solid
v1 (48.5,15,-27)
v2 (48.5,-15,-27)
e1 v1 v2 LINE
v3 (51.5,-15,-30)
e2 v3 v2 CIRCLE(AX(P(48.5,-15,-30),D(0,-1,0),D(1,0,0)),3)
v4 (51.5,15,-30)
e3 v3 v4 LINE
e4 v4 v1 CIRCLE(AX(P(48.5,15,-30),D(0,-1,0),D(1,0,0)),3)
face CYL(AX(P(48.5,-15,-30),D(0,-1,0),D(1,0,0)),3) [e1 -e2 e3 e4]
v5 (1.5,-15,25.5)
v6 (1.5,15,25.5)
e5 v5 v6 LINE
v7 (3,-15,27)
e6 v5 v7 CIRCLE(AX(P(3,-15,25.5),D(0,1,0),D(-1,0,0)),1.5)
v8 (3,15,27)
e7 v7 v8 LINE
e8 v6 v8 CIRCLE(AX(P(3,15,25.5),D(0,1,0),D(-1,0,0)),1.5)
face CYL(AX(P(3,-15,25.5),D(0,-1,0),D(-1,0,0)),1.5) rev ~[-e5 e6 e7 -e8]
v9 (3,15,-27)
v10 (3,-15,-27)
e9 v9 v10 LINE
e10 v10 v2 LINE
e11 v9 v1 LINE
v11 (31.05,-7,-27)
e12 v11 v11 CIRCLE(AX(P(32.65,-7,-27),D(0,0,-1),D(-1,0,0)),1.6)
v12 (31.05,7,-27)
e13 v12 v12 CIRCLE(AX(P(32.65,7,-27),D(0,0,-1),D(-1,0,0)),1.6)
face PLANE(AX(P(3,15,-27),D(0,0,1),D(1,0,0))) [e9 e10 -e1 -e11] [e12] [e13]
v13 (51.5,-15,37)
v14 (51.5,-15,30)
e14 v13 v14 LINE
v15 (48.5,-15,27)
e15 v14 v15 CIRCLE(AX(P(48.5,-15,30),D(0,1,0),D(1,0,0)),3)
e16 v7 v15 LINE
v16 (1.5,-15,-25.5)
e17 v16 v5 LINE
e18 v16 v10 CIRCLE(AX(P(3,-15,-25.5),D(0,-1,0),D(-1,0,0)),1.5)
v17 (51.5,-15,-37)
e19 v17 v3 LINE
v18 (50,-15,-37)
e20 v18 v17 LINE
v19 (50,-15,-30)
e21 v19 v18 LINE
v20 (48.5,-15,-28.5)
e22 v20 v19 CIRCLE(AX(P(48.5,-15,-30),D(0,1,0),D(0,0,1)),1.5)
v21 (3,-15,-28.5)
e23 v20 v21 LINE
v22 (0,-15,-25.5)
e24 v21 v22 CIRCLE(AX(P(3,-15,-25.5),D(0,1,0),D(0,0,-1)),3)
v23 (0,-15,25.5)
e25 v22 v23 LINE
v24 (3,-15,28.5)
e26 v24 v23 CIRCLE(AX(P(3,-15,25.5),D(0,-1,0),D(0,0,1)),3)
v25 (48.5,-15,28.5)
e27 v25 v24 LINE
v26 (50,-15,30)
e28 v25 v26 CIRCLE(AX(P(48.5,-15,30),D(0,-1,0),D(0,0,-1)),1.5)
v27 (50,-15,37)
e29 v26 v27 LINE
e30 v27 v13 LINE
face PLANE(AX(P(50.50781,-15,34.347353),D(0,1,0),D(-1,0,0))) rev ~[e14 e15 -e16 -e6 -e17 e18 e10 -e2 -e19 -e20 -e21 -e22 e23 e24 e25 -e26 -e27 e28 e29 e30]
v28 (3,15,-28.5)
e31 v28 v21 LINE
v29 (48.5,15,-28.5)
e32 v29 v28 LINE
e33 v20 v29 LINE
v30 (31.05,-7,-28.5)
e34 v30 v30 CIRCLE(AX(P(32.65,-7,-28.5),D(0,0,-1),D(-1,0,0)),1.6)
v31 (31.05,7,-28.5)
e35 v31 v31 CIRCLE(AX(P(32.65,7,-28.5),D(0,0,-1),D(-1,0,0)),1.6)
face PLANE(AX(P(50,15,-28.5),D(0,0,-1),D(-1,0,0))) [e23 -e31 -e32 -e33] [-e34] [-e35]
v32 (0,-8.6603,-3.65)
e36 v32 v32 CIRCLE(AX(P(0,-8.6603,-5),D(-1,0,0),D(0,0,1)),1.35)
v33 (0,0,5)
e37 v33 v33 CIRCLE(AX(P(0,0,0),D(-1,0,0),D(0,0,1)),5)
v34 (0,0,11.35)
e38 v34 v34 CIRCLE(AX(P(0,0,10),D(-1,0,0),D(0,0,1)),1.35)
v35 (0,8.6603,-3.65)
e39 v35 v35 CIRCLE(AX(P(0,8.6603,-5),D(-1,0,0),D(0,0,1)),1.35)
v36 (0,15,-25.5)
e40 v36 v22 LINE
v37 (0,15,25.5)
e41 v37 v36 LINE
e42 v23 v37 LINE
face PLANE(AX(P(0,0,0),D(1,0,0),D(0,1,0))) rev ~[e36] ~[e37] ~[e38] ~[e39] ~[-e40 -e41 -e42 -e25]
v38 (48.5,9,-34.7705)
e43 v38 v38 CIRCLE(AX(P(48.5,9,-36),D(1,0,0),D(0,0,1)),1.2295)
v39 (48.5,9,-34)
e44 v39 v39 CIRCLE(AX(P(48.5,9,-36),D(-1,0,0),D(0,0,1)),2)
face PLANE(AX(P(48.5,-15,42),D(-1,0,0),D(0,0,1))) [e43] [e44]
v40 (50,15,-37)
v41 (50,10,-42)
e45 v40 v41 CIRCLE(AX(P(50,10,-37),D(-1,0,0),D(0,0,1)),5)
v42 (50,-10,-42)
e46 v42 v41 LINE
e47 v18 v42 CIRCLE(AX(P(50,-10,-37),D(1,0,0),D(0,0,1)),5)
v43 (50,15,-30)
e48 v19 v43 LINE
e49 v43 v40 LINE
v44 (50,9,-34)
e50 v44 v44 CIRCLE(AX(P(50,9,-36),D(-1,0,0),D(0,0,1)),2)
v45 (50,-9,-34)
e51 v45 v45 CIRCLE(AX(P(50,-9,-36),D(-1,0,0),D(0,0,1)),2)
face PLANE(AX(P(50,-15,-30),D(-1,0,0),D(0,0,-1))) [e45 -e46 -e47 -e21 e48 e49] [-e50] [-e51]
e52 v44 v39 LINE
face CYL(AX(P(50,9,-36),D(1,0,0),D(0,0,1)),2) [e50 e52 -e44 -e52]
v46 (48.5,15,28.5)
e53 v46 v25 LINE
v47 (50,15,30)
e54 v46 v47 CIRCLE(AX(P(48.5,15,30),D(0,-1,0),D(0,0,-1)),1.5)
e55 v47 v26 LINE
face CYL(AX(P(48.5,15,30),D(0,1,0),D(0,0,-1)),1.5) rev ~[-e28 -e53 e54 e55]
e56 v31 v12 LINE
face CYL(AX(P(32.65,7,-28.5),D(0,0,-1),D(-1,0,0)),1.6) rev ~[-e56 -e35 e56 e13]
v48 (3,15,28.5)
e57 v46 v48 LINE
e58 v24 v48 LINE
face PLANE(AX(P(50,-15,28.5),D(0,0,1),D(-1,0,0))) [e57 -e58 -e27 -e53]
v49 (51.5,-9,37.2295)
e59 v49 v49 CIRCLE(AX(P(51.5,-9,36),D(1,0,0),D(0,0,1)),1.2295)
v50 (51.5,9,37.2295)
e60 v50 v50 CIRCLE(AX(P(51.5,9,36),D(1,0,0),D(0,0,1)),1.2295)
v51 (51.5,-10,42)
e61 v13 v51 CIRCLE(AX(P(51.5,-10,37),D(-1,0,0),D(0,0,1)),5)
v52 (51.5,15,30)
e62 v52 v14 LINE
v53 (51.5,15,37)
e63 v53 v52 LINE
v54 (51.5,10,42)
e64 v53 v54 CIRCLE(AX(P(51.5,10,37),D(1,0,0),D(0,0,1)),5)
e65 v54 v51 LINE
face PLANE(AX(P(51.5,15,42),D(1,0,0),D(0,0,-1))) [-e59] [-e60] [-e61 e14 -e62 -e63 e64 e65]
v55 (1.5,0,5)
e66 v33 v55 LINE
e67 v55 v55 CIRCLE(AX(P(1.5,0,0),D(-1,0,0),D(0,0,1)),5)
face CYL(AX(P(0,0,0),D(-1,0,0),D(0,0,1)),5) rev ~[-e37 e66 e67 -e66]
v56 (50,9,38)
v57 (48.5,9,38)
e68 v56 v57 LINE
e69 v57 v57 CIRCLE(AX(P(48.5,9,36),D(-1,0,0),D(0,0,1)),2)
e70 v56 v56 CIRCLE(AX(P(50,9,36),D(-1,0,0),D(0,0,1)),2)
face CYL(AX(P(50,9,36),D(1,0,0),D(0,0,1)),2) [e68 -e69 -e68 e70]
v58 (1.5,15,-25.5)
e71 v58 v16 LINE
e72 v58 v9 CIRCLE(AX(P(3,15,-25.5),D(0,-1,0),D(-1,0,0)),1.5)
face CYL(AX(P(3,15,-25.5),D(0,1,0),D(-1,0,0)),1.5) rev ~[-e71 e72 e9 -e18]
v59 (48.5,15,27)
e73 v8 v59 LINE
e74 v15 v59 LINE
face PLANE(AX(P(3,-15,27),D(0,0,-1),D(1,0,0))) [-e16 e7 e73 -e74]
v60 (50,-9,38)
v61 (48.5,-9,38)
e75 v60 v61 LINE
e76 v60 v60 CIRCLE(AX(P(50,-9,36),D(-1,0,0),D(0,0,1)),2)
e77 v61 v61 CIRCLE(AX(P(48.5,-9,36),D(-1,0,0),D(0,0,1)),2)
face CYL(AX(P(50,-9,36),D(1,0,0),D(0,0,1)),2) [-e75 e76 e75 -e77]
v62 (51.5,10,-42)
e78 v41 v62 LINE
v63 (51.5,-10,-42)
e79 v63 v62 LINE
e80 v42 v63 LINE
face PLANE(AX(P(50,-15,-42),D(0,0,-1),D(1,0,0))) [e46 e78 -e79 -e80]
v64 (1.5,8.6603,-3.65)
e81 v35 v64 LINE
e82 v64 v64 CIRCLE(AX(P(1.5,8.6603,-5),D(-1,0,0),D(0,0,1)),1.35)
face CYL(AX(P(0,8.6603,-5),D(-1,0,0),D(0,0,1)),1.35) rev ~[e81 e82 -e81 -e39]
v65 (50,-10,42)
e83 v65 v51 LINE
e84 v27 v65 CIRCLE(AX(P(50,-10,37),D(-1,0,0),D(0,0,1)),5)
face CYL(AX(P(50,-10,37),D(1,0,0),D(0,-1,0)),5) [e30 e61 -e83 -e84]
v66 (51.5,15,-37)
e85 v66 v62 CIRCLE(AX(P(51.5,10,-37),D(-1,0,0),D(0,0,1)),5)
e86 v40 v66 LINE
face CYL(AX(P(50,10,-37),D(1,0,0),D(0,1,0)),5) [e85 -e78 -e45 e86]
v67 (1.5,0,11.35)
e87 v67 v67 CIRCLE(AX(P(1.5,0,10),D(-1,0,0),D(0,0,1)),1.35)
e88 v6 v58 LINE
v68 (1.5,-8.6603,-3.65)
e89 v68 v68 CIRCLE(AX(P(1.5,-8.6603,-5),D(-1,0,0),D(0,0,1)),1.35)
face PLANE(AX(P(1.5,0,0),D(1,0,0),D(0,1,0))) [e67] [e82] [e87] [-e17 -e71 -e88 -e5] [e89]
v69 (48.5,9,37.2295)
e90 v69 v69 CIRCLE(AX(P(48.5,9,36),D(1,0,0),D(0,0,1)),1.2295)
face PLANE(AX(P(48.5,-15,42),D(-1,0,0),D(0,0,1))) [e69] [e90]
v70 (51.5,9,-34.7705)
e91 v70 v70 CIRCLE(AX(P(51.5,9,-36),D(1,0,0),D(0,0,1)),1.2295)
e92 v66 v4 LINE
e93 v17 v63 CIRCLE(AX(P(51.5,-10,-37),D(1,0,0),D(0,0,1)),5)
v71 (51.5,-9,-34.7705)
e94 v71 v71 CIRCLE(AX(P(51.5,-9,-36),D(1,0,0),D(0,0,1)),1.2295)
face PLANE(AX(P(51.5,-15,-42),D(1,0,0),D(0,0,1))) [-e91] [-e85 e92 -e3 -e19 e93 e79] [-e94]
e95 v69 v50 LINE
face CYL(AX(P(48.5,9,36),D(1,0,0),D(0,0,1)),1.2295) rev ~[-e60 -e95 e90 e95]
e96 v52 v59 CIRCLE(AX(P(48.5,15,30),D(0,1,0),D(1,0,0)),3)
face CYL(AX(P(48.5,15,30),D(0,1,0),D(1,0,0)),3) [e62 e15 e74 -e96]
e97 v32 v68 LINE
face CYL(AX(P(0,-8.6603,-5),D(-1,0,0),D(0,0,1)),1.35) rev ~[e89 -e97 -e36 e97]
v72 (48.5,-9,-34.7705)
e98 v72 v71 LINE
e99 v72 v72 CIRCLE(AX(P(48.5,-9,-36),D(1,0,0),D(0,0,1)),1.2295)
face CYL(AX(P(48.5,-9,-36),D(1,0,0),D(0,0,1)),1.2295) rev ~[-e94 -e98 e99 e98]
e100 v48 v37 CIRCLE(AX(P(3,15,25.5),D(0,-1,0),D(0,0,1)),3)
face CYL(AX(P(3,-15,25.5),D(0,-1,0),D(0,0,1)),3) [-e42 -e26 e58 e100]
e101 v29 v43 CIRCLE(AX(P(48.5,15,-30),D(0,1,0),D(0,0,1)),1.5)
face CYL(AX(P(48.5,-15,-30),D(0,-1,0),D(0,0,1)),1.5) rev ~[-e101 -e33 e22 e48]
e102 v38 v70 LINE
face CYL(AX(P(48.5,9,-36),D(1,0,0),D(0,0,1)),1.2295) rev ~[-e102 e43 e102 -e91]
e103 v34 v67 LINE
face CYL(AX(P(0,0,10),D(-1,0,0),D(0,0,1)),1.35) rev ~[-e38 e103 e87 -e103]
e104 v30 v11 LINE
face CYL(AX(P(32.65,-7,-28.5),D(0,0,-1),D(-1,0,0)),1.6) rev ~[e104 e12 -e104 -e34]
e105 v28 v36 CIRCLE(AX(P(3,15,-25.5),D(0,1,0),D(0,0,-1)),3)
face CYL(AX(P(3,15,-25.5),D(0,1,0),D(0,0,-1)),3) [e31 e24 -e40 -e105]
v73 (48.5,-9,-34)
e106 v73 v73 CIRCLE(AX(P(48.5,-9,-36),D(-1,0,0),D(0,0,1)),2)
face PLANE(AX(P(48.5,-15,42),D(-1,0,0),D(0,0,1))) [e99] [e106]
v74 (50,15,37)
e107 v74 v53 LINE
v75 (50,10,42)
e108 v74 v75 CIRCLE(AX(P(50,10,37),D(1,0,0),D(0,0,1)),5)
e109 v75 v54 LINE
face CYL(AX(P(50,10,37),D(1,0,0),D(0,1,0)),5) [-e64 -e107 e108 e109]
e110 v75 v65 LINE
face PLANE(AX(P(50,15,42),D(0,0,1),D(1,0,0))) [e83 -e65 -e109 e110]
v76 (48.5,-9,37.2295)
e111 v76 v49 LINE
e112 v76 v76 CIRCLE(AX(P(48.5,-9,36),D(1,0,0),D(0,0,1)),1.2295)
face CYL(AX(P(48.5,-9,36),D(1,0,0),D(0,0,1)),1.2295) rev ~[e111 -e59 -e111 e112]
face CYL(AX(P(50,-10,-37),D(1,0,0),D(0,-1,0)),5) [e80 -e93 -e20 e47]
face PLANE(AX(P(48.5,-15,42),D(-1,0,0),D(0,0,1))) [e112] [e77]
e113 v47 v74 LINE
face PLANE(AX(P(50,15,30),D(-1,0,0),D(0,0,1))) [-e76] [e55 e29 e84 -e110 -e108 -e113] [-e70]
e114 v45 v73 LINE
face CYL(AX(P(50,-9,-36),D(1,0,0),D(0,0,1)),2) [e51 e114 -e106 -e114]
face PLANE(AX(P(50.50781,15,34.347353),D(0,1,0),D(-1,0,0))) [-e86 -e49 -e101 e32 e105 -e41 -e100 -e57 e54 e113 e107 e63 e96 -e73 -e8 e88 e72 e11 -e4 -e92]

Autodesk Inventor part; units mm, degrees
ref_plane "YZ Plane" through (0, 0, 0) normal (1, 0, 0) x (0, 1, 0)
ref_plane "XZ Plane" through (0, 0, 0) normal (0, 1, 0) x (-1, 0, 0)
ref_plane "XY Plane" through (0, 0, 0) normal (0, 0, 1) x (1, 0, 0)
sketch "スケッチ1" plane through (0, 0, 0) normal (1, 0, 0) x (0, 1, 0)
  line L0 (-15, -27) -> (-15, 27)
  line L1 (-15, 27) -> (15, 27)
  line L2 (15, 27) -> (15, -27)
  line L3 (15, -27) -> (-15, -27)
  line L4 (-15, -27) -> (15, 27) construction
  line L5 (-15, 27) -> (15, -27) construction
  point P0 (0, 0)
  dimension "d0" = 30
  dimension "d1" = 54
extrude "プレート1" add sketch "スケッチ1" along normal blind 1.5
sketch "スケッチ2" plane through (1.5, -15, 27) normal (0, 0, 1) x (1, 0, 0)
  line L0 (0, 30) -> (0, 0)
  line L1 (0, 0) -> (48.5, 0)
  line L2 (48.5, 0) -> (48.5, 30)
  line L3 (48.5, 30) -> (0, 30)
edge flange "フランジ1" height 50 angle 90 thickness 1.5 bend radius 1.5 thickness toward (0, 0, 1) relief tear relief width 1.5 relief depth 0.75 corner gap 1.5 corner form 0 edges at (1.5, 0, 27) (1.5, 0, -27) wall of the first edge with corners at (1.5, 15, 27) (1.5, -15, 27) (50, -15, 27) (50, 15, 27)
bend "曲げ1"
corner "コーナー1"
sketch "スケッチ3" plane through (50, 15, 28.5) normal (1, 0, 0) x (0, 1, 0)
  line L0 (-30, 0) -> (0, 0)
  line L1 (0, 0) -> (0, 13.5)
  line L2 (0, 13.5) -> (-30, 13.5)
  line L3 (-30, 13.5) -> (-30, 0)
edge flange "フランジ2" height 15 angle 90 thickness 1.5 bend radius 1.5 thickness toward (1, 0, 0) relief tear relief width 1.5 relief depth 0.75 corner gap 1.5 corner form 0 edges at (50, 0, 28.5) (50, 0, -28.5) wall of the first edge with corners at (50, -15, 28.5) (50, 15, 28.5) (50, 15, 42) (50, -15, 42)
bend "曲げ2"
corner "コーナー2"
sketch "スケッチ4" plane through (0, 0, 0) normal (-1, 0, 0) x (0, 0, 1)
  circle A0 centre (0, 0) radius 5
  circle A1 centre (10, 0) radius 1.35
  circle A2 centre (-5, 8.6603) radius 1.35
  circle A3 centre (-5, -8.6603) radius 1.35
  dimension "d23" = 10
  dimension "d24" = 2.7
  dimension "d25" = 0
  dimension "d26" = 10
  dimension "d29" = 360
extrude "押し出し1" cut sketch "スケッチ4" against normal blind 2
sketch "スケッチ6" plane through (50, -15, 42) normal (-1, 0, 0) x (0, 0, 1)
  circle A0 centre (-6, 24) radius 2
  line L0 (-12, 30) -> (0, 30) projected
  line L1 (0, 0) -> (0, 30) projected
  circle A1 centre (-6, 6) radius 2
  circle A2 centre (-78, 24) radius 2
  circle A3 centre (-78, 6) radius 2
  point P0 (-42, 15)
  dimension "d41" = 4
  dimension "d42" = 4
  dimension "d43" = 4
  dimension "d46" = 18
  dimension "d49" = 72
extrude "押し出し3" add sketch "スケッチ6" along normal blind 1.5
sketch "スケッチ7" plane through (48.5, 9, 36) normal (-1, 0, 0) x (0, 0, 1)
  circle A0 centre (0, 0) radius 2 projected
  circle A1 centre (0, -18) radius 2 projected
  circle A2 centre (-72, -18) radius 2 projected
  circle A3 centre (-72, 0) radius 2 projected
  circle A4 centre (0, 0) radius 2 projected
  circle A5 centre (0, -18) radius 2 projected
  circle A6 centre (-72, -18) radius 2 projected
  point P0 (-36, -9)
hole "穴1" at (48.5, 9, 36) at (48.5, -9, 36) at (48.5, 9, -36) at (48.5, -9, -36) direction (1, 0, 0) diameter 2.459 depth 3 thread size "M3x0.5" designation "M3" class "6H" standard "GB Metric profile"
fillet "フィレット1" radius 5 4 edges at (50.75, 15, 42) (50.75, -15, 42) (50.75, 15, -42) (50.75, -15, -42)
sketch "スケッチ8" plane through (3, -15, -28.5) normal (0, 0, -1) x (-1, 0, 0)
  circle A0 centre (-29.65, 22) radius 1.6
  line L0 (-47, 25) -> (-47, 5) projected
  line L1 (-45.5, 30) -> (0, 30) projected
  circle A1 centre (-29.65, 8) radius 1.6
  point P0 (3, 15)
  dimension "d62" = 3.2
  dimension "d63" = 17.35
  dimension "d64" = 8
  dimension "d67" = 14
extrude "押し出し4" cut sketch "スケッチ8" against normal blind 10
equation "\"d59\" = Thickness"
equation "\"BendRadius\" = Thickness"
equation "\"BendReliefWidth\" = Thickness"
equation "\"BendReliefDepth\" = 0.5 * Thickness"
equation "\"CornerReliefSize\" = 4 * Thickness"
equation "\"MinimumRemnant\" = 2 * Thickness"
equation "\"TransitionRadius\" = BendRadius"
equation "\"JacobiRadiusSize\" = BendRadius"
equation "\"GapSize\" = Thickness"
properties part number "Old_hand_box2" material "アルミニウム 6061"
